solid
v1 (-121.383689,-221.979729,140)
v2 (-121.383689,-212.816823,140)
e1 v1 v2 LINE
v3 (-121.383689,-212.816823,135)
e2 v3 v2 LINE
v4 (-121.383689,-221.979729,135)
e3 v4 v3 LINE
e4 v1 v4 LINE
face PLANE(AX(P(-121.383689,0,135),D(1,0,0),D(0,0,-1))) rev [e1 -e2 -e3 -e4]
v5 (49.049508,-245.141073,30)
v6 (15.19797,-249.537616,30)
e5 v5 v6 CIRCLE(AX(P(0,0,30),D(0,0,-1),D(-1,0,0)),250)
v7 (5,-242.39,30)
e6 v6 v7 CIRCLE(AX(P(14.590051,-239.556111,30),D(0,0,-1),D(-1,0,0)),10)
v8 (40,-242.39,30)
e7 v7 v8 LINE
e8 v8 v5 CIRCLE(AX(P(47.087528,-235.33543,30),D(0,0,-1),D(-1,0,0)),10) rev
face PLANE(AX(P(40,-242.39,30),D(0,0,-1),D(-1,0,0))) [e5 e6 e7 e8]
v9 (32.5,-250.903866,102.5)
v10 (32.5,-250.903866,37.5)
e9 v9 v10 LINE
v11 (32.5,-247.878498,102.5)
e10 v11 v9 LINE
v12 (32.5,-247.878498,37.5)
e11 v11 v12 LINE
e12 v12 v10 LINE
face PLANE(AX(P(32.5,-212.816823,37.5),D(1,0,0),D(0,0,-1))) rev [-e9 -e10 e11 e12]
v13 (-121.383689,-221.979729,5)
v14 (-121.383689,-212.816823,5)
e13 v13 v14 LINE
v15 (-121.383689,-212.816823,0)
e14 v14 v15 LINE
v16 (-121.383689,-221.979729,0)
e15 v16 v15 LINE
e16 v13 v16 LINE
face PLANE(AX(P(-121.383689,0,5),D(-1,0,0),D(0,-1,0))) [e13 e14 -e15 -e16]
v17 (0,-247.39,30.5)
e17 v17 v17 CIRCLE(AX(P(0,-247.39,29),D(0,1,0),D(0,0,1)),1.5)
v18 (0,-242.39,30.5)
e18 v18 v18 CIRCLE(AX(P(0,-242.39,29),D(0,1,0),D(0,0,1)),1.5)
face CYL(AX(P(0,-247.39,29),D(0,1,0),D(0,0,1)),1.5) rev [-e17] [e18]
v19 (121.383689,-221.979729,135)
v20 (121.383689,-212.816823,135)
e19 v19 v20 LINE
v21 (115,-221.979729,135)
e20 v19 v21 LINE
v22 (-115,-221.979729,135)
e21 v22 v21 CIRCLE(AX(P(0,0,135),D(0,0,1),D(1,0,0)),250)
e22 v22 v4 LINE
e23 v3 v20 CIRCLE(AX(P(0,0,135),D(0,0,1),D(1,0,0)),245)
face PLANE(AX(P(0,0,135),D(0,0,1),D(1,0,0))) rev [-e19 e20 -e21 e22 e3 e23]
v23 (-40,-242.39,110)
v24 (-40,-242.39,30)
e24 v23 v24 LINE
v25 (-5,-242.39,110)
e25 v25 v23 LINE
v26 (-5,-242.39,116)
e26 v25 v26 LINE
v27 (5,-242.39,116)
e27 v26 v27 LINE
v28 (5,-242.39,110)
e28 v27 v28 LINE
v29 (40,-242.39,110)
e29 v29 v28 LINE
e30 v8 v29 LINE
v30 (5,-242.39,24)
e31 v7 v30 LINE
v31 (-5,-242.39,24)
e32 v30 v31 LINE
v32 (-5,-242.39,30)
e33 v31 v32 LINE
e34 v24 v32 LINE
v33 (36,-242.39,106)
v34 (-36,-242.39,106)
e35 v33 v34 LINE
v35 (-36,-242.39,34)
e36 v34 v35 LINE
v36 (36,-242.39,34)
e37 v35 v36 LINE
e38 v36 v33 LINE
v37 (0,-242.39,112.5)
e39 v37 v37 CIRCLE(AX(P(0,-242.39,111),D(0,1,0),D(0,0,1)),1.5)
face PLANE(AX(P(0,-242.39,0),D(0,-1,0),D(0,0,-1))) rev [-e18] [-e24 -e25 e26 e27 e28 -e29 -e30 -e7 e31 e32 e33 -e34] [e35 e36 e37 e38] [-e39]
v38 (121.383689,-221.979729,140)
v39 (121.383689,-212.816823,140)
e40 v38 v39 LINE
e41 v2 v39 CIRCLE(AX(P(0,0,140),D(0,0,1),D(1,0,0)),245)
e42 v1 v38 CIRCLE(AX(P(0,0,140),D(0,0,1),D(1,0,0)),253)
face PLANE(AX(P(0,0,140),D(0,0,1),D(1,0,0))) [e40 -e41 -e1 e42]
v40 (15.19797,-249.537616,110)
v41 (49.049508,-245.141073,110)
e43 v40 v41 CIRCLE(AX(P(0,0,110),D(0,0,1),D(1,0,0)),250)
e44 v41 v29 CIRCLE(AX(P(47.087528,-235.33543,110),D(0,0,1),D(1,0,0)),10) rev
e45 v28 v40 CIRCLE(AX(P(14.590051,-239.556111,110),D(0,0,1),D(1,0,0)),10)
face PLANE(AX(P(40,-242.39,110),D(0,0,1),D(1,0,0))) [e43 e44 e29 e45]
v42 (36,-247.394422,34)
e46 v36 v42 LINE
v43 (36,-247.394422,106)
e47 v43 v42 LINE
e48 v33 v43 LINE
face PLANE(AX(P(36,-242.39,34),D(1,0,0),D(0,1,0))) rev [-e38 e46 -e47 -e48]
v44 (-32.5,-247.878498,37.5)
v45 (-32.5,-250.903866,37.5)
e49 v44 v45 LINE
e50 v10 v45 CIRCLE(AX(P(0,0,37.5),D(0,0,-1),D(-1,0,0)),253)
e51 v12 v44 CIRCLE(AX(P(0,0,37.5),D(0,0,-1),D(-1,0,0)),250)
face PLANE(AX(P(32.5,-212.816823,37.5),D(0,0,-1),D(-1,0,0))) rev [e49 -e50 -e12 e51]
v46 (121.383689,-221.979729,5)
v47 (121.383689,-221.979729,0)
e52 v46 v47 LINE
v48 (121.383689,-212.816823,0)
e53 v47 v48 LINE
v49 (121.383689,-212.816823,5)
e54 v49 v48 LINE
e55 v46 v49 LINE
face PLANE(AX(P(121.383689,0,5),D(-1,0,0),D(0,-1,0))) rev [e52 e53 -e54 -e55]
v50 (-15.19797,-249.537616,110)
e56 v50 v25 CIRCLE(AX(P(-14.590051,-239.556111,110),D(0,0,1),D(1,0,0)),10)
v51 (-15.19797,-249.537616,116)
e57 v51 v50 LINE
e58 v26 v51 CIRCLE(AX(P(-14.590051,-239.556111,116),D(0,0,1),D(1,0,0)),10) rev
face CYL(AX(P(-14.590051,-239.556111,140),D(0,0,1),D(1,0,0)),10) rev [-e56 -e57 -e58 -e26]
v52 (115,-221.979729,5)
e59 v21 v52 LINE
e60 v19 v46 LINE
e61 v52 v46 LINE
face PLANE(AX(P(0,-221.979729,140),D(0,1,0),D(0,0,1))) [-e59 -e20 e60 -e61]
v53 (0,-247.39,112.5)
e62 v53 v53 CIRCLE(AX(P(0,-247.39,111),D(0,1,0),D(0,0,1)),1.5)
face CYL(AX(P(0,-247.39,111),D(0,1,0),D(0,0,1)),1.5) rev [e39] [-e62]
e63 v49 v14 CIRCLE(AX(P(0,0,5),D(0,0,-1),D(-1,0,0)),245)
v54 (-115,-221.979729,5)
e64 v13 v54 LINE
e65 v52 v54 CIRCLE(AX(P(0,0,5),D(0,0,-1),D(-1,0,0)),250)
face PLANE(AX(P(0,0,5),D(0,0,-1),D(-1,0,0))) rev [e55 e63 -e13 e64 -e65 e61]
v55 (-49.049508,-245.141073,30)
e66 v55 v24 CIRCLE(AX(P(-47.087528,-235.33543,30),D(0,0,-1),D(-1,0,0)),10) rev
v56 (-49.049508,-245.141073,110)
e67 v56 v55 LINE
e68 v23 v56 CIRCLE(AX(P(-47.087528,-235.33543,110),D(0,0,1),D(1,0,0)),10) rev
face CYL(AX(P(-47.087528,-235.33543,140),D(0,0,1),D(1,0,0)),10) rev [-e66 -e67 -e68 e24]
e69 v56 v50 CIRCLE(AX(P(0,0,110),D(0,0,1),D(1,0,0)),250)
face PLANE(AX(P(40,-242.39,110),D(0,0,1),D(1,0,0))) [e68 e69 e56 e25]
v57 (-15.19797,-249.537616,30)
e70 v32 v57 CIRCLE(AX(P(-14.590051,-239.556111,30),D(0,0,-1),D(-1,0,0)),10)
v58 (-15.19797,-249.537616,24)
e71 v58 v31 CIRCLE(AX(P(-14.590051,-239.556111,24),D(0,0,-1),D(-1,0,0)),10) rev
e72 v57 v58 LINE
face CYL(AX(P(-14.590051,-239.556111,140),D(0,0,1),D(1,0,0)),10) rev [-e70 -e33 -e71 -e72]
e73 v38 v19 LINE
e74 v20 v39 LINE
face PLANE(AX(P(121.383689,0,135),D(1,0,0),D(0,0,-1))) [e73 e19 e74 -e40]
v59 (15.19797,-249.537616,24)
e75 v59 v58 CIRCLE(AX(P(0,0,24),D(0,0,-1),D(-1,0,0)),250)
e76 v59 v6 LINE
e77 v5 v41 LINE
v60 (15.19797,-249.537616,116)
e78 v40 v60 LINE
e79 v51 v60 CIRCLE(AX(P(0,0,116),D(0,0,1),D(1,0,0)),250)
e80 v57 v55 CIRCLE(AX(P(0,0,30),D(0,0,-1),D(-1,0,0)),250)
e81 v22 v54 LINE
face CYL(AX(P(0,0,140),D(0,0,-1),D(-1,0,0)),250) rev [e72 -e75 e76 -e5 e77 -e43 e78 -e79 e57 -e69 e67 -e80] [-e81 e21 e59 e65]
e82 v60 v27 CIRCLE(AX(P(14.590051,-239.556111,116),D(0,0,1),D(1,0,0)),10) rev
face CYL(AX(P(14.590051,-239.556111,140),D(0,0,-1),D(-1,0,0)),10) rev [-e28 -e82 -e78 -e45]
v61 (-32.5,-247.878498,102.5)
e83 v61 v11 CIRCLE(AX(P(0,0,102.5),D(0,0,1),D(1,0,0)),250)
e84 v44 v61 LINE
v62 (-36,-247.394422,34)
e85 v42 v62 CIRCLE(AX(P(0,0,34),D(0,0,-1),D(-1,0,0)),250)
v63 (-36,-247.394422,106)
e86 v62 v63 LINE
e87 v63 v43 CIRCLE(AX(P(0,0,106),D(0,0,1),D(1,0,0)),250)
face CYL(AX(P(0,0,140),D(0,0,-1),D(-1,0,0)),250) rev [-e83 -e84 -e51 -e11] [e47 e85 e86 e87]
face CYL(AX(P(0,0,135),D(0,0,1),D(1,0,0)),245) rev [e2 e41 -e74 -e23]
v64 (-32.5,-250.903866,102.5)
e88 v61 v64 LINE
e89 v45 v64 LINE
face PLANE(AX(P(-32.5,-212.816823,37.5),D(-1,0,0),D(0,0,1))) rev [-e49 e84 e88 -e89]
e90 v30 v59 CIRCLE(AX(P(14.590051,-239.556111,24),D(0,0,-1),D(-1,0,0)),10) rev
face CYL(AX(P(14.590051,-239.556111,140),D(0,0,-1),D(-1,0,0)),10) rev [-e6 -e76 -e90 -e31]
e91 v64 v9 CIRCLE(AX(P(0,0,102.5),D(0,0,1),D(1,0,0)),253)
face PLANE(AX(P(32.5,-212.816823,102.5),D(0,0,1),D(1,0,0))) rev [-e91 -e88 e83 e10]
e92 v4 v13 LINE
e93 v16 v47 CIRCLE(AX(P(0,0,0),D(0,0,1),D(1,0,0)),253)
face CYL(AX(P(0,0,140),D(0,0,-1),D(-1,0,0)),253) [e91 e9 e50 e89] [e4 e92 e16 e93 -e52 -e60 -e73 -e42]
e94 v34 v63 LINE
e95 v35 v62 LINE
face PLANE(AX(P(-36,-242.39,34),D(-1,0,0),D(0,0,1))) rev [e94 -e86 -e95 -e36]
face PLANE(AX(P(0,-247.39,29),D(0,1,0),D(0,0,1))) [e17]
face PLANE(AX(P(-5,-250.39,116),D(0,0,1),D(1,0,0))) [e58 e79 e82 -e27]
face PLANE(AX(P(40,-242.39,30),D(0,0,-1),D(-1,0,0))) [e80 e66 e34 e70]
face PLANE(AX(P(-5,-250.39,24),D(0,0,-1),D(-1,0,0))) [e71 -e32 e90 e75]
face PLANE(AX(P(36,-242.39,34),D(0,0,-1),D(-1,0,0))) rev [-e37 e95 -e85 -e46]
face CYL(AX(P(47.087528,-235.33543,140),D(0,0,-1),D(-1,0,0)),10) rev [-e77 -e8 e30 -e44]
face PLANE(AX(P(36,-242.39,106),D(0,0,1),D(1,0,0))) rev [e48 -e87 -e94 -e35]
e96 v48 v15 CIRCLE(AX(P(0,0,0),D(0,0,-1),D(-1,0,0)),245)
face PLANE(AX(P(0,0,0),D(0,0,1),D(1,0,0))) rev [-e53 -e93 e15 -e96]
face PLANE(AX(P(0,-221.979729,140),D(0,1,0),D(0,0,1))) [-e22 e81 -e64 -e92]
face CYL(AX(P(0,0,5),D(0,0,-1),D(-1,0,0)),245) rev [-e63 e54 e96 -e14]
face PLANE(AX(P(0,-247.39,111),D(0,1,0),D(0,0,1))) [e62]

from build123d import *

# Parameters (mm, degrees)
ESTRUSIONE_ESTRUSIONE1_DEPTH = 140
ESTRUSIONE_ESTRUSIONE2_START = -5
ESTRUSIONE_ESTRUSIONE2_DEPTH = 5
ESTRUSIONE_ESTRUSIONE3_DEPTH = 5
SCHIZZO4_W                   = 65
SCHIZZO4_H                   = 65
TAGLIO_ESTRUSIONE1_DEPTH     = 190.601391721
SCHIZZO6_W                   = 80
SCHIZZO6_H                   = 80
SCHIZZO6_W_2                 = 72
SCHIZZO6_H_2                 = 72
ESTRUSIONE_ESTRUSIONE5_DEPTH = 10.61
SCHIZZO8_W                   = 10
SCHIZZO8_H                   = 6
ESTRUSIONE_ESTRUSIONE6_DEPTH = 8
SCHIZZO9_R                   = 1.5
TAGLIO_ESTRUSIONE2_DEPTH     = 5
TAGLIO_ESTRUSIONE3_DEPTH     = 314.596874984
RACCORDO1_R                  = 10


with BuildPart() as part:
    # Schizzo1 → Estrusione-Estrusione1 (new body)
    with BuildSketch(Plane.XY):
        with BuildLine():
            Line((121.383689184, -221.979728804), (115, -221.979728804))
            ThreePointArc((115, -221.979728804), (0, -250), (-115, -221.979728804))
            Line((-115, -221.979728804), (-121.383689184, -221.979728804))
            ThreePointArc((-121.383689184, -221.979728804), (0, -253), (121.383689184, -221.979728804))
        make_face()
    extrude(amount=ESTRUSIONE_ESTRUSIONE1_DEPTH)

    # Schizzo2 → Estrusione-Estrusione2 (add)
    with BuildSketch(Plane.XY.offset(140).offset(ESTRUSIONE_ESTRUSIONE2_START)):
        with BuildLine():
            Line((-121.383689184, -218.554341069), (-121.383689184, -221.979728804))
            Line((-121.383689184, -221.979728804), (-115, -221.979728804))
            ThreePointArc((-115, -221.979728804), (-118.204253089, -220.290159906), (-121.383689184, -218.554341069))
        make_face()
        with BuildLine():
            Line((-121.383689184, -212.816822643), (-121.383689184, -218.554341069))
            ThreePointArc((-121.383689184, -218.554341069), (-118.204253089, -220.290159906), (-115, -221.979728804))
            ThreePointArc((-115, -221.979728804), (0, -250), (115, -221.979728804))
            ThreePointArc((115, -221.979728804), (118.204253089, -220.290159906), (121.383689184, -218.554341069))
            Line((121.383689184, -218.554341069), (121.383689184, -212.816822643))
            ThreePointArc((121.383689184, -212.816822643), (0, -245), (-121.383689184, -212.816822643))
        make_face()
        with BuildLine():
            Line((115, -221.979728804), (121.383689184, -221.979728804))
            Line((121.383689184, -221.979728804), (121.383689184, -218.554341069))
            ThreePointArc((121.383689184, -218.554341069), (118.204253089, -220.290159906), (115, -221.979728804))
        make_face()
    extrude(amount=ESTRUSIONE_ESTRUSIONE2_DEPTH)

    # Schizzo3 → Estrusione-Estrusione3 (add)
    with BuildSketch(Plane(origin=(0, 0, 0), x_dir=(-1, 0, 0), z_dir=(0, 0, -1))):
        with BuildLine():
            Line((-121.383689184, -212.816822643), (-121.383689184, -218.554341069))
            ThreePointArc((-121.383689184, -218.554341069), (-118.204253089, -220.290159906), (-115, -221.979728804))
            ThreePointArc((-115, -221.979728804), (0, -250), (115, -221.979728804))
            ThreePointArc((115, -221.979728804), (118.204253089, -220.290159906), (121.383689184, -218.554341069))
            Line((121.383689184, -218.554341069), (121.383689184, -212.816822643))
            ThreePointArc((121.383689184, -212.816822643), (0, -245), (-121.383689184, -212.816822643))
        make_face()
        with BuildLine():
            Line((115, -221.979728804), (121.383689184, -221.979728804))
            Line((121.383689184, -221.979728804), (121.383689184, -218.554341069))
            ThreePointArc((121.383689184, -218.554341069), (118.204253089, -220.290159906), (115, -221.979728804))
        make_face()
        with BuildLine():
            Line((-121.383689184, -218.554341069), (-121.383689184, -221.979728804))
            Line((-121.383689184, -221.979728804), (-115, -221.979728804))
            ThreePointArc((-115, -221.979728804), (-118.204253089, -220.290159906), (-121.383689184, -218.554341069))
        make_face()
    extrude(amount=-ESTRUSIONE_ESTRUSIONE3_DEPTH)

    # Schizzo4 → Taglio-Estrusione1 (cut, through all)
    with BuildSketch(Plane(origin=(0, -253, 0), x_dir=(-1, 0, 0), z_dir=(0, -1, 0))):
        with Locations((0, -70)):
            Rectangle(SCHIZZO4_W, SCHIZZO4_H)
    extrude(amount=-TAGLIO_ESTRUSIONE1_DEPTH, mode=Mode.SUBTRACT)

    # Schizzo6 → Estrusione-Estrusione5 (add)
    with BuildSketch(Plane(origin=(0, -253, 0), x_dir=(-1, 0, 0), z_dir=(0, -1, 0))):
        with Locations((0, -70)):
            Rectangle(SCHIZZO6_W, SCHIZZO6_H)
        with Locations((0, -70)):
            Rectangle(SCHIZZO6_W_2, SCHIZZO6_H_2, mode=Mode.SUBTRACT)
    extrude(amount=-ESTRUSIONE_ESTRUSIONE5_DEPTH)

    # Schizzo8 → Estrusione-Estrusione6 (add)
    with BuildSketch(Plane(origin=(0, -242.39, 0), x_dir=(1, 0, 0), z_dir=(0, 1, 0))):
        with Locations((0, -27)):
            Rectangle(SCHIZZO8_W, SCHIZZO8_H)
        with Locations((0, -113)):
            Rectangle(SCHIZZO8_W, SCHIZZO8_H)
    extrude(amount=-ESTRUSIONE_ESTRUSIONE6_DEPTH)

    # Schizzo9 → Taglio-Estrusione2 (cut)
    with BuildSketch(Plane(origin=(0, -242.39, 0), x_dir=(1, 0, 0), z_dir=(0, 1, 0))):
        with Locations(Location((0, -29, 0), (0, 0, 270))):
            Circle(SCHIZZO9_R)
        with Locations(Location((0, -111, 0), (0, 0, 270))):
            Circle(SCHIZZO9_R)
    extrude(amount=-TAGLIO_ESTRUSIONE2_DEPTH, mode=Mode.SUBTRACT)

    # Schizzo10 → Taglio-Estrusione3 (cut, through all)
    with BuildSketch(Plane(origin=(0, 0, 0), x_dir=(-1, 0, 0), z_dir=(0, 0, -1))):
        with BuildLine():
            Line((-121.383689184, -295.114305534), (125.369855002, -295.114305534))
            Line((125.369855002, -295.114305534), (121.383689184, -221.979728804))
            ThreePointArc((121.383689184, -221.979728804), (0, -253), (-121.383689184, -221.979728804))
            Line((-121.383689184, -221.979728804), (-121.383689184, -295.114305534))
        make_face()
    extrude(amount=-TAGLIO_ESTRUSIONE3_DEPTH, mode=Mode.SUBTRACT)

    # Raccordo1
    # the kernel refuses this fillet: 10 mm, written as the material it adds along each edge
    with BuildSketch(Plane(origin=(5, -249.949994999, 55.515759856), x_dir=(0.999183410527211, 0.04040435777500708, 0), z_dir=(0, 0, -1))) as raccordo1_piece_1_section:
        with BuildLine():
            CenterArc((10.002177863, -9.99791641), RACCORDO1_R, 88.830362483, 77.02269885)
            Line((0.305456743, -7.553821587), (0, 0))
            ThreePointArc((0, 0), (5.103151971, 0.052089747), (10.206303942, 0))
        make_face()
    raccordo1_piece_1 = extrude(amount=31.515759856, mode=Mode.PRIVATE)
    raccordo1_piece_1 = split(raccordo1_piece_1, bisect_by=Plane(origin=(10.036552928, -248.481695624, 34), z_dir=(0, 0, -1)), keep=Keep.TOP, mode=Mode.PRIVATE)
    add(raccordo1_piece_1)
    with BuildSketch(Plane(origin=(40, -246.779253585, 110), x_dir=(0.9840071168859134, 0.17812914954569523, 0), z_dir=(0, 0, -1))) as raccordo1_piece_2:
        with BuildLine():
            CenterArc((9.012656027, -9.998308312), RACCORDO1_R, 88.946089238, 56.448243915)
            Line((0.781854008, -4.319056766), (0, 0))
            ThreePointArc((0, 0), (4.598293891, 0.042292191), (9.196587782, 0))
        make_face()
    extrude(amount=80)
    with BuildSketch(Plane(origin=(5, -249.949994999, 116), x_dir=(0.9991834105272109, 0.04040435777500963, 0), z_dir=(0, 0, -1))) as raccordo1_piece_3_section:
        with BuildLine():
            CenterArc((10.002177863, -9.99791641), RACCORDO1_R, 88.830362483, 77.02269885)
            Line((0.305456743, -7.553821587), (0, 0))
            ThreePointArc((0, 0), (5.103151971, 0.052089747), (10.206303942, 0))
        make_face()
    raccordo1_piece_3 = extrude(amount=31.515759856, mode=Mode.PRIVATE)
    raccordo1_piece_3 = split(raccordo1_piece_3, bisect_by=Plane(origin=(10.036552928, -248.481695624, 106), z_dir=(0, 0, 1)), keep=Keep.TOP, mode=Mode.PRIVATE)
    add(raccordo1_piece_3)
    with BuildSketch(Plane(origin=(-5, -249.949994999, 116), x_dir=(-0.9991834105272109, 0.04040435777501259, 0), z_dir=(0, 0, -1))) as raccordo1_piece_4_section:
        with BuildLine():
            CenterArc((10.002177863, 9.99791641), RACCORDO1_R, 194.146938667, 77.02269885)
            Line((0.305456743, 7.553821587), (0, 0))
            ThreePointArc((0, 0), (5.103151971, -0.052089747), (10.206303942, 0))
        make_face()
    raccordo1_piece_4 = extrude(amount=31.515759856, mode=Mode.PRIVATE)
    raccordo1_piece_4 = split(raccordo1_piece_4, bisect_by=Plane(origin=(-10.036552928, -248.481695624, 106), z_dir=(0, 0, 1)), keep=Keep.TOP, mode=Mode.PRIVATE)
    add(raccordo1_piece_4)
    with BuildSketch(Plane(origin=(-40, -246.779253585, 110), x_dir=(-0.9840071168859144, 0.17812914954568923, 0), z_dir=(0, 0, -1))) as raccordo1_piece_5:
        with BuildLine():
            CenterArc((9.012656027, 9.998308312), RACCORDO1_R, 214.605666847, 56.448243915)
            Line((0.781854008, 4.319056766), (0, 0))
            ThreePointArc((0, 0), (4.598293891, -0.042292191), (9.196587782, 0))
        make_face()
    extrude(amount=80)
    with BuildSketch(Plane(origin=(-5, -249.949994999, 55.515759856), x_dir=(-0.9991834105272107, 0.040404357775012466, 0), z_dir=(0, 0, -1))) as raccordo1_piece_6_section:
        with BuildLine():
            CenterArc((10.002177863, 9.99791641), RACCORDO1_R, 194.146938667, 77.02269885)
            Line((0.305456743, 7.553821587), (0, 0))
            ThreePointArc((0, 0), (5.103151971, -0.052089747), (10.206303942, 0))
        make_face()
    raccordo1_piece_6 = extrude(amount=31.515759856, mode=Mode.PRIVATE)
    raccordo1_piece_6 = split(raccordo1_piece_6, bisect_by=Plane(origin=(-10.036552928, -248.481695624, 34), z_dir=(0, 0, -1)), keep=Keep.TOP, mode=Mode.PRIVATE)
    add(raccordo1_piece_6)


solid = part.part
